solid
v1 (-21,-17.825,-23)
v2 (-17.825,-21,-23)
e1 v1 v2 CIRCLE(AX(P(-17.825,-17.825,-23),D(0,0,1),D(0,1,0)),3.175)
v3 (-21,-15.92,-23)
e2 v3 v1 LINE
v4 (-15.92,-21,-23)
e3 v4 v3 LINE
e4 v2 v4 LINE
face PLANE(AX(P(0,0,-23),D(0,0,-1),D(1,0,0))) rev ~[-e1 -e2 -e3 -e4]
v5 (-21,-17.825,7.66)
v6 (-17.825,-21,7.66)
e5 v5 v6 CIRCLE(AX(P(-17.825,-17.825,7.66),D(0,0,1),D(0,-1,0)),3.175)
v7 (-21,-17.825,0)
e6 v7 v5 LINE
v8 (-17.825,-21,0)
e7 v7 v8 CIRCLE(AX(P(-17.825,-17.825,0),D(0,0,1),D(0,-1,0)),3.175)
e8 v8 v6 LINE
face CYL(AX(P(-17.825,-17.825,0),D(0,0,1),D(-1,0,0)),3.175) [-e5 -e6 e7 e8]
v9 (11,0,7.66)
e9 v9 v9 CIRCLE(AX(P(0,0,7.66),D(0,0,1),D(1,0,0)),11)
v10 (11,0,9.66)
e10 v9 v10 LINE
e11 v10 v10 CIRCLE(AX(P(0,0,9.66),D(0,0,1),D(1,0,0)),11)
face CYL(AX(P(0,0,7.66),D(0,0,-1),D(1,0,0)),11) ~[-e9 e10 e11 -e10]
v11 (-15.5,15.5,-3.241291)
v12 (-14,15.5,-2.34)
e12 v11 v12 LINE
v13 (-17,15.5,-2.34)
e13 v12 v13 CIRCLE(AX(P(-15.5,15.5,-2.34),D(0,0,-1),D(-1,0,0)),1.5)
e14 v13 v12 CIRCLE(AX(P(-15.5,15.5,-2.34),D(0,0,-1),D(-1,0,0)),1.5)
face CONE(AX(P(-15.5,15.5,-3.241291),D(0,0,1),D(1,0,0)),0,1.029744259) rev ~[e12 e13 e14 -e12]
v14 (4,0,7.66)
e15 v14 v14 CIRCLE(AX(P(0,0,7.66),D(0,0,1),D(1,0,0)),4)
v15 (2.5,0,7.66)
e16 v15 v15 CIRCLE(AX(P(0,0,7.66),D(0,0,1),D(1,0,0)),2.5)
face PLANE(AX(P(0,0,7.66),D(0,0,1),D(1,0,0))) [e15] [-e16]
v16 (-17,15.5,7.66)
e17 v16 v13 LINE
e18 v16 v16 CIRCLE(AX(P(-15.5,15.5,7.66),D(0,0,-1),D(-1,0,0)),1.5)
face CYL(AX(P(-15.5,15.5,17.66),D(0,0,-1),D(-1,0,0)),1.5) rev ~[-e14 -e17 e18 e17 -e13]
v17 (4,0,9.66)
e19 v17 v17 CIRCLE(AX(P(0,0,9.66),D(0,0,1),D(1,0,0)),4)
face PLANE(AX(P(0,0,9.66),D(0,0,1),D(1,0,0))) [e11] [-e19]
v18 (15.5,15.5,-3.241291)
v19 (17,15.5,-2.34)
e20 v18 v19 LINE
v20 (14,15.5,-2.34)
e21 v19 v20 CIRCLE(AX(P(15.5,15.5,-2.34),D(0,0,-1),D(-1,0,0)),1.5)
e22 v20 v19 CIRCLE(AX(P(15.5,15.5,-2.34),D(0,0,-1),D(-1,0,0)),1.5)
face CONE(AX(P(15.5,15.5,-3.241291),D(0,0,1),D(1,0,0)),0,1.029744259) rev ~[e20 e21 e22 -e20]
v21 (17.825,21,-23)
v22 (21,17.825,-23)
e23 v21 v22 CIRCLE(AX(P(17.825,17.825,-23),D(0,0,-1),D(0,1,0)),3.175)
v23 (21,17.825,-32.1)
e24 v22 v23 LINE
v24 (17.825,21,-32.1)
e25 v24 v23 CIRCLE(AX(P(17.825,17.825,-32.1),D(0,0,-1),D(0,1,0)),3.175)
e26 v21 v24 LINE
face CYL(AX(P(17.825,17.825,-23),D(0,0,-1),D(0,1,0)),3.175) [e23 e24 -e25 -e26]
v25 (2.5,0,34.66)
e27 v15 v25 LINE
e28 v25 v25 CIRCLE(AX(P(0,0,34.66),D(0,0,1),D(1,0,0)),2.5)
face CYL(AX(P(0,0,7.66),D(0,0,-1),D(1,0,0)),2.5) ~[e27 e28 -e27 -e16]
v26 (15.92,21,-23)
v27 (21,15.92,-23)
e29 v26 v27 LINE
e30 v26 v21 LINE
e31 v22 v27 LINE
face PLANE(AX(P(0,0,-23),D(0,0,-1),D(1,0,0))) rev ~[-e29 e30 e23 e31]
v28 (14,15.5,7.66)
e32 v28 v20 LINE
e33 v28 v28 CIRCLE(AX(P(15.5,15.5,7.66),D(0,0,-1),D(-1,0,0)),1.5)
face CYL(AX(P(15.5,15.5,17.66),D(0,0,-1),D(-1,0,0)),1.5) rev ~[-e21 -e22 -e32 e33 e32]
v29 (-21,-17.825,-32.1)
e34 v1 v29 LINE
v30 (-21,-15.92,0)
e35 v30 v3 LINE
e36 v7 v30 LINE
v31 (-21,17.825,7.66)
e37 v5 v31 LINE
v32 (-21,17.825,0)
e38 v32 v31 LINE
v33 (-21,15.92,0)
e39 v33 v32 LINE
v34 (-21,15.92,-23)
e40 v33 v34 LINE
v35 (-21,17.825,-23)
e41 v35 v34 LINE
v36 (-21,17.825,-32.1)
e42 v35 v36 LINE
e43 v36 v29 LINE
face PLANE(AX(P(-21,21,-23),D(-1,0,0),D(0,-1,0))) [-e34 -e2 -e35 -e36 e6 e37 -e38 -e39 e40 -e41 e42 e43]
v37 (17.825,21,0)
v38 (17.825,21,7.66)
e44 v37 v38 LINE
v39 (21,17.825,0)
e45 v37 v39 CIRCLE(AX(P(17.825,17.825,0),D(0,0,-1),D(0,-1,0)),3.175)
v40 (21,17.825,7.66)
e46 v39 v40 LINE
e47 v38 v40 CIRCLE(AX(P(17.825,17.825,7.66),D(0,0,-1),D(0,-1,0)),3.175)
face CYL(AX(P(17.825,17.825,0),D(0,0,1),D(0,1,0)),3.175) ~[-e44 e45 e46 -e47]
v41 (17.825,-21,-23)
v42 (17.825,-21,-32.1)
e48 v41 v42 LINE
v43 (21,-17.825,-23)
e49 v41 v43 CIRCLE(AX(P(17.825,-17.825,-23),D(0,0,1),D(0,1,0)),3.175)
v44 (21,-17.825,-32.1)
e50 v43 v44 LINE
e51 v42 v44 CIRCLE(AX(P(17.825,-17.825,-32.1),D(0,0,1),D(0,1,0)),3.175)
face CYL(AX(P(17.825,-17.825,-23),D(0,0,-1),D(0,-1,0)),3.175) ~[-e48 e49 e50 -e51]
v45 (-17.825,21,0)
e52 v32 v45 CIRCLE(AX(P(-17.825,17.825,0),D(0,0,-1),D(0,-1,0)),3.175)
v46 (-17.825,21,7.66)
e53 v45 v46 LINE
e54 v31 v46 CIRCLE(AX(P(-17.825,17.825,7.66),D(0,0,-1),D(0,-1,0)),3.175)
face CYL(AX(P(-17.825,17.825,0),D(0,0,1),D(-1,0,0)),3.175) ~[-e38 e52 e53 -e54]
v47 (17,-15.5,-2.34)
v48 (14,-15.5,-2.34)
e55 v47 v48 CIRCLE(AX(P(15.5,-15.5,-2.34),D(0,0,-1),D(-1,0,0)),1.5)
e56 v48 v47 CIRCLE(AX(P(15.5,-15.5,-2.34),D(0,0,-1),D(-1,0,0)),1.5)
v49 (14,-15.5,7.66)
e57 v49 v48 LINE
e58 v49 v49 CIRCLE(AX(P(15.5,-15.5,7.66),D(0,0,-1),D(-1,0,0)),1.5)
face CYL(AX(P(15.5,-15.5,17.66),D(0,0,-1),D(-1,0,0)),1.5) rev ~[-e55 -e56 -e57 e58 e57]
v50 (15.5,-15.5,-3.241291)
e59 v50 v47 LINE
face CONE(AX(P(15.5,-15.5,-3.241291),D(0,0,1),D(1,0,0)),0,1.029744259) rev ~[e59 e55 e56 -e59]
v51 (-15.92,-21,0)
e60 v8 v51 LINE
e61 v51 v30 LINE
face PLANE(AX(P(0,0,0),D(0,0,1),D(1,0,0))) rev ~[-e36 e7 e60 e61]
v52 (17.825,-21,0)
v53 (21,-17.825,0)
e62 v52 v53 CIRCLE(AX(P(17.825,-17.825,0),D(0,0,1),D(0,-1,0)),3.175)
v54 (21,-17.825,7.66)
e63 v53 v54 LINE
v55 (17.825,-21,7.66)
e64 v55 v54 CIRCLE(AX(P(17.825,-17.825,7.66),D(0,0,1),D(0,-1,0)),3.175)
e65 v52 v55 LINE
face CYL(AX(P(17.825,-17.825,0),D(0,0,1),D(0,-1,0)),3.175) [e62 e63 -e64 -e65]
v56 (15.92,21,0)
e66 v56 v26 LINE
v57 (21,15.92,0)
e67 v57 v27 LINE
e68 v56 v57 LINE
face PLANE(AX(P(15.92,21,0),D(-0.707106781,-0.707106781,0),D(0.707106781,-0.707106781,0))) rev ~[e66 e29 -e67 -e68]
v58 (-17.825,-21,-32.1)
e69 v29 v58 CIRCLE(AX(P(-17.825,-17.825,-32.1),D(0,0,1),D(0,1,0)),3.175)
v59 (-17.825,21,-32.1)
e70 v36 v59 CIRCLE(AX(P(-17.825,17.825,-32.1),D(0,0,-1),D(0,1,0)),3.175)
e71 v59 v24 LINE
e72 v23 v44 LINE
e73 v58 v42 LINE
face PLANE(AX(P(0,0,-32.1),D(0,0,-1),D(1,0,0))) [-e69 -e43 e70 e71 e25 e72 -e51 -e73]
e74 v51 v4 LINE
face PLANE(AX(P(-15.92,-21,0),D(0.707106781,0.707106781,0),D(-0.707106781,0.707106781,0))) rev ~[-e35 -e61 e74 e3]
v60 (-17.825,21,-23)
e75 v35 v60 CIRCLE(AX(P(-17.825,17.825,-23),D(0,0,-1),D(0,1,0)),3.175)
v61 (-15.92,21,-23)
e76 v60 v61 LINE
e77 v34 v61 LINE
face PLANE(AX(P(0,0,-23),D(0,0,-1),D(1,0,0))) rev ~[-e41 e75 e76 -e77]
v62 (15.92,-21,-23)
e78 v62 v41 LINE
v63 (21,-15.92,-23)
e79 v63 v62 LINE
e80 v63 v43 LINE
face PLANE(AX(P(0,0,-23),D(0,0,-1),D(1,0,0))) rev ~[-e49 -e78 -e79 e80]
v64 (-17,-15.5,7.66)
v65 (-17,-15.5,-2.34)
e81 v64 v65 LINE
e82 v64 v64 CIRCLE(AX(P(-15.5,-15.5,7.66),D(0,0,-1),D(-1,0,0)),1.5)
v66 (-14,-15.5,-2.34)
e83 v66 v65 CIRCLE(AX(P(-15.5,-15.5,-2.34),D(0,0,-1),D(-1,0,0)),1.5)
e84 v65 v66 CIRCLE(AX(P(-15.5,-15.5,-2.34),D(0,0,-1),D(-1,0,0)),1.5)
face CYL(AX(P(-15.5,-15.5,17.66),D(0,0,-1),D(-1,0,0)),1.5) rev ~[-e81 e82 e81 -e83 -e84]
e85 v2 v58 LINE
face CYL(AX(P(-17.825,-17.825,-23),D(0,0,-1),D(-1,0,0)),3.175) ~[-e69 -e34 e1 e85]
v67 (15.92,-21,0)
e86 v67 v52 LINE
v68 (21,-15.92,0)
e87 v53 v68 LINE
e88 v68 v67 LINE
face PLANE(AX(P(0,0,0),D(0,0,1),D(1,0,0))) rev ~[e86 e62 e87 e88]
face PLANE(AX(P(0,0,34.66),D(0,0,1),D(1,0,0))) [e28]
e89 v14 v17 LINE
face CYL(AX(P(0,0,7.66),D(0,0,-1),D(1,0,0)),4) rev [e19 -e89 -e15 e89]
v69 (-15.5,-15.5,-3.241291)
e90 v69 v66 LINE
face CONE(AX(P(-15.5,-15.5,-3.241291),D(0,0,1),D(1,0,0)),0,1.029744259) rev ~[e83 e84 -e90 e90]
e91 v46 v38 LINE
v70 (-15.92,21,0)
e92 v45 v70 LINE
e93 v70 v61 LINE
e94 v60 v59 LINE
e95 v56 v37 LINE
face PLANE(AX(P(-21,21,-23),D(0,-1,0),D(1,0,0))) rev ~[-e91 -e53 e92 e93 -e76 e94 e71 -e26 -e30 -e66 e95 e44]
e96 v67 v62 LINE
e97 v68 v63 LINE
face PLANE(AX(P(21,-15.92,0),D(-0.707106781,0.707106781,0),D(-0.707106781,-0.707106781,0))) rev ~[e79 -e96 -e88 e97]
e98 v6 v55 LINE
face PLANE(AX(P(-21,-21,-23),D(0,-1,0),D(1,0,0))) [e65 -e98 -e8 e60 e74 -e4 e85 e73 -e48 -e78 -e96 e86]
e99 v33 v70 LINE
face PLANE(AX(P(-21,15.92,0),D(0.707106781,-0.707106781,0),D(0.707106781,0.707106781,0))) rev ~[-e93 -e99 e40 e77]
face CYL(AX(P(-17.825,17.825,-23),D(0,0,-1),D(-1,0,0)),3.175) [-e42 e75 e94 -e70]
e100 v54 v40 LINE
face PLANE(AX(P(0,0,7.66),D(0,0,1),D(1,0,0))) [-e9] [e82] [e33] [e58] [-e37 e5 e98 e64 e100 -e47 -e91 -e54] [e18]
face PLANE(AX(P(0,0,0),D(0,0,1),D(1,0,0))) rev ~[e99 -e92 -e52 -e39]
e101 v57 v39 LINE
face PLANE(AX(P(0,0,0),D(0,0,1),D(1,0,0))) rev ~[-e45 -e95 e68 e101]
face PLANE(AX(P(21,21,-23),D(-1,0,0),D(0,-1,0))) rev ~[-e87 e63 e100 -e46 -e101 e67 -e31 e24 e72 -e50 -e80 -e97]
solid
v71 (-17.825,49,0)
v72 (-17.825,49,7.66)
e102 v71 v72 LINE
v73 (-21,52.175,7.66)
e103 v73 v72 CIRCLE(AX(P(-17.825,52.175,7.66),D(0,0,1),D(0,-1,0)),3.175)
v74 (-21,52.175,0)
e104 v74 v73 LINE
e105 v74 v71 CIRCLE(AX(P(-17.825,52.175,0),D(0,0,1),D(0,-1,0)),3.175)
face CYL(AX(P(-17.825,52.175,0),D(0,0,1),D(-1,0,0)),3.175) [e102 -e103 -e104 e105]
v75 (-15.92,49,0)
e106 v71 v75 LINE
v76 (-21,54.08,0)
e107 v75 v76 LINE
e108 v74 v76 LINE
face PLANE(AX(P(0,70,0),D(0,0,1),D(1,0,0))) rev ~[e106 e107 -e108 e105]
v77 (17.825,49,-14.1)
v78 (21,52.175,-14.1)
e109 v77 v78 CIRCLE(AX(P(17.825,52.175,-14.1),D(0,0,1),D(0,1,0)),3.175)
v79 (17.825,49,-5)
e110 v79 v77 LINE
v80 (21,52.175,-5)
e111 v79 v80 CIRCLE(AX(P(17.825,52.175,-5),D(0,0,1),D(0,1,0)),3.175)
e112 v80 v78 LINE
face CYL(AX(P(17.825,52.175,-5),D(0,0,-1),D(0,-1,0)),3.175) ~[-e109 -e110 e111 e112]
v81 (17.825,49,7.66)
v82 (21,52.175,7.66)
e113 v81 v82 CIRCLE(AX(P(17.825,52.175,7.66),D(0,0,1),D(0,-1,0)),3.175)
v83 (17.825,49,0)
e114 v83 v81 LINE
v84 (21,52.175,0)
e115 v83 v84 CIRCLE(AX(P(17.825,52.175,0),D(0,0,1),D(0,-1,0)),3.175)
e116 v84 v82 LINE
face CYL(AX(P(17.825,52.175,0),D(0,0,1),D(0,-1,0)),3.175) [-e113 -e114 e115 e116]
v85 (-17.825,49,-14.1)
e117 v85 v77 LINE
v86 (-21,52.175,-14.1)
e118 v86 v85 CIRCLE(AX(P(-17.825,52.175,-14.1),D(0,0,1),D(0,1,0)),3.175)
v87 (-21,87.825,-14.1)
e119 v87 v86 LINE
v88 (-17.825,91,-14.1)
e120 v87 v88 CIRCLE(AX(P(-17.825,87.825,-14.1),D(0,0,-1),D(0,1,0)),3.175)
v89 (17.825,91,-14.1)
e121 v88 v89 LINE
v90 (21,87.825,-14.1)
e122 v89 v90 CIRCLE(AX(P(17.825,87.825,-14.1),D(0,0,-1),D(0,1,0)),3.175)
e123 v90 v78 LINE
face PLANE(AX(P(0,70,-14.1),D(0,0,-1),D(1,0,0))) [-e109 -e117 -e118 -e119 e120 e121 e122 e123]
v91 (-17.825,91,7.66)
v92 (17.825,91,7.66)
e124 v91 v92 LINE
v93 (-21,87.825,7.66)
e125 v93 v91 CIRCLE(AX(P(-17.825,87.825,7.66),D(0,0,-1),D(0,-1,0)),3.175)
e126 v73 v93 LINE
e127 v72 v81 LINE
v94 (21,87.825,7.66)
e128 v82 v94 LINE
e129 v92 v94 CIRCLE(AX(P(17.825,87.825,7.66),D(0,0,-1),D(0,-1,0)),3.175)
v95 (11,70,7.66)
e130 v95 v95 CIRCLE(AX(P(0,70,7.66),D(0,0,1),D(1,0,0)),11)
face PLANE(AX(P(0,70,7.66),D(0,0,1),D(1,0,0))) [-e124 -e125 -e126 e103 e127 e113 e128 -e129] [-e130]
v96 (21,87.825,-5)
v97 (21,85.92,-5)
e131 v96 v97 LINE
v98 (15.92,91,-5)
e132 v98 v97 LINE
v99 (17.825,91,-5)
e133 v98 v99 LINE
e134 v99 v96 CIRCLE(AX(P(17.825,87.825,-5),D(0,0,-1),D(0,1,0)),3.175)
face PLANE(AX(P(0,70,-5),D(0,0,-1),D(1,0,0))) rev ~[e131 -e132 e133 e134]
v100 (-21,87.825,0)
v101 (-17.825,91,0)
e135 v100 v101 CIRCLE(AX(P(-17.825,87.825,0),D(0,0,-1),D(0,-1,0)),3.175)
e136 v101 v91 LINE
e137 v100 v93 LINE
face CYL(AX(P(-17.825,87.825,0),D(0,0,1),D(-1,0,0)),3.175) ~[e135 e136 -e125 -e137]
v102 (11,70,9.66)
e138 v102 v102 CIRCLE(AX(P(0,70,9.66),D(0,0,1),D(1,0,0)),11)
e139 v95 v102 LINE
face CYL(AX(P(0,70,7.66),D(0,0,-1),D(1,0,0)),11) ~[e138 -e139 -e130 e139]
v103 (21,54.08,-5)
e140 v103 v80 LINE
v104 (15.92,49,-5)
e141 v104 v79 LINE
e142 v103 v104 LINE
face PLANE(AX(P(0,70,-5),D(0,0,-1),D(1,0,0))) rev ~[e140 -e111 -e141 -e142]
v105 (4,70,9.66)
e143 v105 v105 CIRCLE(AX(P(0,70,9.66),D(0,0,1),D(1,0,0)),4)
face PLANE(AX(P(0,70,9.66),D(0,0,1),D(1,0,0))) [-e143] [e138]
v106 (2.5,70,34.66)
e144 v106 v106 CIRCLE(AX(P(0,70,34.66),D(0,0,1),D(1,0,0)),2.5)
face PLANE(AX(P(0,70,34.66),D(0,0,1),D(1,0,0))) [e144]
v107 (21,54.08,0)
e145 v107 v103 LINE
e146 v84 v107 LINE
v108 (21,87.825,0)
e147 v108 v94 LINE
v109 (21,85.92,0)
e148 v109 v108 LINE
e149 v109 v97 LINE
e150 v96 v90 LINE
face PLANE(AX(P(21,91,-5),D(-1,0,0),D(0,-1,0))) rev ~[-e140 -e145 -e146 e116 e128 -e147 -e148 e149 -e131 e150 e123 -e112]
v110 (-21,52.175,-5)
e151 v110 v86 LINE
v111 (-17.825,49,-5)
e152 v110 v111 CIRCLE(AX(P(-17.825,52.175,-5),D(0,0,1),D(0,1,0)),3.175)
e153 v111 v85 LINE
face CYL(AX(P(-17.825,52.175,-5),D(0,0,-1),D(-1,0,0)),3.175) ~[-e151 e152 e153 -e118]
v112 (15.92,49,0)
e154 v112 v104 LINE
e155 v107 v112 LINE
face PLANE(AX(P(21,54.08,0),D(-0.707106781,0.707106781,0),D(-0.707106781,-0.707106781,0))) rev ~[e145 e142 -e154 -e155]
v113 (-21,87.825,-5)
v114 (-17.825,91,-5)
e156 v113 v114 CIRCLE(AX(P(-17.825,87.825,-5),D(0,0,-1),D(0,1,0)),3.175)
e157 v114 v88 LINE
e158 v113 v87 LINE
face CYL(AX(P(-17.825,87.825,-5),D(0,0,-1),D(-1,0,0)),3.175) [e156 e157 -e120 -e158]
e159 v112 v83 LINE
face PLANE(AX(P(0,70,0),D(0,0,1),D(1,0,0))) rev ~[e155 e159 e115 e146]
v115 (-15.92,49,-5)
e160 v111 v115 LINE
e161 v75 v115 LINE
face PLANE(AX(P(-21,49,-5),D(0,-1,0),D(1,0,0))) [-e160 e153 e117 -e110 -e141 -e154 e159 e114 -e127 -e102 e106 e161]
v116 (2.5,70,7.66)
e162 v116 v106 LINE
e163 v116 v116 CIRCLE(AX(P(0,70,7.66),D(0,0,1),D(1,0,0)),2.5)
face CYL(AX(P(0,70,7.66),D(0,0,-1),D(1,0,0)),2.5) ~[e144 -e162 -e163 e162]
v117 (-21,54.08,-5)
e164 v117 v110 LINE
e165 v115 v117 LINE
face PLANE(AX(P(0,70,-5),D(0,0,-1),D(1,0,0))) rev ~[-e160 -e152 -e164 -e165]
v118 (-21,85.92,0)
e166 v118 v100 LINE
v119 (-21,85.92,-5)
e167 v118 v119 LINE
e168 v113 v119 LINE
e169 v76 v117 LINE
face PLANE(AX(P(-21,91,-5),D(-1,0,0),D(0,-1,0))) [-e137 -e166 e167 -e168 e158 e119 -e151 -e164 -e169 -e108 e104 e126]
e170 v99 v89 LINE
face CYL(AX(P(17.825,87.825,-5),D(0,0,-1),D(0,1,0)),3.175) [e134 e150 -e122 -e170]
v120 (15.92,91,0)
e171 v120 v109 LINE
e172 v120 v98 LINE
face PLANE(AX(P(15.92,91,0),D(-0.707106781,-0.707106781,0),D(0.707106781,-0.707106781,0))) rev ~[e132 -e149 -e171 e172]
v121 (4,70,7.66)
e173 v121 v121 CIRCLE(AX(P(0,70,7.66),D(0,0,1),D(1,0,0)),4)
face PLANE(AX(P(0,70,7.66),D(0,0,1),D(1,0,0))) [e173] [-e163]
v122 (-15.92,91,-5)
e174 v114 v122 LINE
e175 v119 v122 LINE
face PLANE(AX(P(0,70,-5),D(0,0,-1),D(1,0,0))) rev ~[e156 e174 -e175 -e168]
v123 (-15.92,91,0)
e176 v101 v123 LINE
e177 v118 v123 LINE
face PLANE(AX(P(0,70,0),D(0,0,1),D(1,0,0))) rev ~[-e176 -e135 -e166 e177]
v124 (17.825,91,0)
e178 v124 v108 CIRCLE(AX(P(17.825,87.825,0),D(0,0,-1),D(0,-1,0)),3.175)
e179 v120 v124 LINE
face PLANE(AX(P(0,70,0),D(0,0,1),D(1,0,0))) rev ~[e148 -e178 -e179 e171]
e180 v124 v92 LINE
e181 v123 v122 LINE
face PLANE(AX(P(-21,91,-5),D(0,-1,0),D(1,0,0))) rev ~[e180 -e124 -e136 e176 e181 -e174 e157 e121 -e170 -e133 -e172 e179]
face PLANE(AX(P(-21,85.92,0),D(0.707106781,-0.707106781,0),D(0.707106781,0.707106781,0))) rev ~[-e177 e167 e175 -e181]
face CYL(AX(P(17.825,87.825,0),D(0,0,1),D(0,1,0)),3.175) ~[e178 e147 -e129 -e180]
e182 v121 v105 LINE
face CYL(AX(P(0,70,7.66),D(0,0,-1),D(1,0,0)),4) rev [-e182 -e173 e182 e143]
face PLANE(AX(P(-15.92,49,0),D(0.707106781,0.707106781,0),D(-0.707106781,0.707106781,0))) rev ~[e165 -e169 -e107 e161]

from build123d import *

# Parameters (mm, degrees)
F0_W      = 42
F0_H      = 42
F1_DEPTH  = 7.66
F2_R      = 11
F2_R_2    = 4
F3_DEPTH  = 2
F5_DEPTH  = 23
F6_DEPTH  = 5
F7_W      = 42
F7_H      = 42
F9_DEPTH  = 9.1
F8_W      = 42
F8_H      = 42
F10_R     = 3.175
F10_2_R   = 3.175
F11_D     = 3
F11_DEPTH = 10
F11_TIP   = 0.9012909285
F2_R_3    = 2.5
F12_DEPTH = 27


# Not quite as in the source:
# - a feature names something its author has since deleted; it is built from what else it names


with BuildPart() as f1:
    # F0 (on Top) → F1 (new body)
    with BuildSketch(Plane.XY):
        Rectangle(F0_W, F0_H)
    extrude(amount=F1_DEPTH)

    # F2 (on face) → F3 (join)
    with BuildSketch(Plane.XY.offset(7.66)):
        Circle(F2_R)
        Circle(F2_R_2, mode=Mode.SUBTRACT)
    extrude(amount=F3_DEPTH)

    # F4 (on face) → F5 (join)
    with BuildSketch(Plane(origin=(0, 0, 0), x_dir=(1, 0, 0), z_dir=(0, 0, -1))):
        Polygon((-21, -15.92), (-15.92, -21), (15.92, -21), (21, -15.92), (21, 15.92), (15.92, 21), (-15.92, 21), (-21, 15.92), align=None)
    extrude(amount=F5_DEPTH)

    # F7 (on face) → F9 (join)
    with BuildSketch(Plane(origin=(0, 0, -23), x_dir=(1, 0, 0), z_dir=(0, 0, -1))):
        Rectangle(F7_W, F7_H)
    extrude(amount=F9_DEPTH)

    # F10
    f10_edges = [f1.edges().sort_by_distance(p)[0] for p in [
        (21, 21, 3.83),
        (21, -21, 3.83),
        (-21, -21, 3.83),
        (-21, 21, 3.83),
        (21, -21, -27.55),
        (-21, 21, -27.55),
        (-21, -21, -27.55),
        (21, 21, -27.55),
    ]]
    fillet(f10_edges, radius=F10_R)

    # F11
    with Locations(Plane.XY.offset(7.66)):
        with Locations((15.5, 15.5), (-15.5, 15.5), (15.5, -15.5), (-15.5, -15.5), (15.5, 54.5), (-15.5, 54.5), (-15.5, 85.5), (15.5, 85.5)):
            Hole(F11_D / 2, depth=F11_DEPTH)
            with Locations((0, 0, -(F11_DEPTH + F11_TIP / 2))):  # 118° drill point
                Cone(0, F11_D / 2, F11_TIP, mode=Mode.SUBTRACT)

    # F2 (on face) → F12 (join)
    with BuildSketch(Plane.XY.offset(7.66)):
        Circle(F2_R_3)
    extrude(amount=F12_DEPTH)


with BuildPart() as f1b:
    # F0 (on Top) → F1, piece 2 (new body)
    with BuildSketch(Plane.XY):
        with Locations((0, 70)):
            Rectangle(F0_W, F0_H)
    extrude(amount=F1_DEPTH)

    # F2 (on face) → F3, piece 2 (join)
    with BuildSketch(Plane.XY.offset(7.66)):
        with Locations((0, 70)):
            Circle(F2_R)
        with Locations((0, 70)):
            Circle(F2_R_2, mode=Mode.SUBTRACT)
    extrude(amount=F3_DEPTH)

    # F4 (on face) → F6 (join)
    with BuildSketch(Plane(origin=(0, 0, 0), x_dir=(1, 0, 0), z_dir=(0, 0, -1))):
        Polygon((-21, -85.92), (-15.92, -91), (15.92, -91), (21, -85.92), (21, -54.08), (15.92, -49), (-15.92, -49), (-21, -54.08), align=None)
    extrude(amount=F6_DEPTH)

    # F8 (on face) → F9, piece 2 (join)
    with BuildSketch(Plane(origin=(0, 0, -5), x_dir=(1, 0, 0), z_dir=(0, 0, -1))):
        with Locations((0, -70)):
            Rectangle(F8_W, F8_H)
    extrude(amount=F9_DEPTH)

    # F10#2
    f10_2_edges = [f1b.edges().sort_by_distance(p)[0] for p in [
        (-21, 91, 3.83),
        (-21, 49, 3.83),
        (21, 91, 3.83),
        (21, 49, 3.83),
        (-21, 49, -9.55),
        (-21, 91, -9.55),
        (21, 91, -9.55),
        (21, 49, -9.55),
    ]]
    fillet(f10_2_edges, radius=F10_2_R)

    # F2 (on face) → F12, piece 2 (join)
    with BuildSketch(Plane.XY.offset(7.66)):
        with Locations((0, 70)):
            Circle(F2_R_3)
    extrude(amount=F12_DEPTH)


solid = Compound([f1.part, f1b.part])
